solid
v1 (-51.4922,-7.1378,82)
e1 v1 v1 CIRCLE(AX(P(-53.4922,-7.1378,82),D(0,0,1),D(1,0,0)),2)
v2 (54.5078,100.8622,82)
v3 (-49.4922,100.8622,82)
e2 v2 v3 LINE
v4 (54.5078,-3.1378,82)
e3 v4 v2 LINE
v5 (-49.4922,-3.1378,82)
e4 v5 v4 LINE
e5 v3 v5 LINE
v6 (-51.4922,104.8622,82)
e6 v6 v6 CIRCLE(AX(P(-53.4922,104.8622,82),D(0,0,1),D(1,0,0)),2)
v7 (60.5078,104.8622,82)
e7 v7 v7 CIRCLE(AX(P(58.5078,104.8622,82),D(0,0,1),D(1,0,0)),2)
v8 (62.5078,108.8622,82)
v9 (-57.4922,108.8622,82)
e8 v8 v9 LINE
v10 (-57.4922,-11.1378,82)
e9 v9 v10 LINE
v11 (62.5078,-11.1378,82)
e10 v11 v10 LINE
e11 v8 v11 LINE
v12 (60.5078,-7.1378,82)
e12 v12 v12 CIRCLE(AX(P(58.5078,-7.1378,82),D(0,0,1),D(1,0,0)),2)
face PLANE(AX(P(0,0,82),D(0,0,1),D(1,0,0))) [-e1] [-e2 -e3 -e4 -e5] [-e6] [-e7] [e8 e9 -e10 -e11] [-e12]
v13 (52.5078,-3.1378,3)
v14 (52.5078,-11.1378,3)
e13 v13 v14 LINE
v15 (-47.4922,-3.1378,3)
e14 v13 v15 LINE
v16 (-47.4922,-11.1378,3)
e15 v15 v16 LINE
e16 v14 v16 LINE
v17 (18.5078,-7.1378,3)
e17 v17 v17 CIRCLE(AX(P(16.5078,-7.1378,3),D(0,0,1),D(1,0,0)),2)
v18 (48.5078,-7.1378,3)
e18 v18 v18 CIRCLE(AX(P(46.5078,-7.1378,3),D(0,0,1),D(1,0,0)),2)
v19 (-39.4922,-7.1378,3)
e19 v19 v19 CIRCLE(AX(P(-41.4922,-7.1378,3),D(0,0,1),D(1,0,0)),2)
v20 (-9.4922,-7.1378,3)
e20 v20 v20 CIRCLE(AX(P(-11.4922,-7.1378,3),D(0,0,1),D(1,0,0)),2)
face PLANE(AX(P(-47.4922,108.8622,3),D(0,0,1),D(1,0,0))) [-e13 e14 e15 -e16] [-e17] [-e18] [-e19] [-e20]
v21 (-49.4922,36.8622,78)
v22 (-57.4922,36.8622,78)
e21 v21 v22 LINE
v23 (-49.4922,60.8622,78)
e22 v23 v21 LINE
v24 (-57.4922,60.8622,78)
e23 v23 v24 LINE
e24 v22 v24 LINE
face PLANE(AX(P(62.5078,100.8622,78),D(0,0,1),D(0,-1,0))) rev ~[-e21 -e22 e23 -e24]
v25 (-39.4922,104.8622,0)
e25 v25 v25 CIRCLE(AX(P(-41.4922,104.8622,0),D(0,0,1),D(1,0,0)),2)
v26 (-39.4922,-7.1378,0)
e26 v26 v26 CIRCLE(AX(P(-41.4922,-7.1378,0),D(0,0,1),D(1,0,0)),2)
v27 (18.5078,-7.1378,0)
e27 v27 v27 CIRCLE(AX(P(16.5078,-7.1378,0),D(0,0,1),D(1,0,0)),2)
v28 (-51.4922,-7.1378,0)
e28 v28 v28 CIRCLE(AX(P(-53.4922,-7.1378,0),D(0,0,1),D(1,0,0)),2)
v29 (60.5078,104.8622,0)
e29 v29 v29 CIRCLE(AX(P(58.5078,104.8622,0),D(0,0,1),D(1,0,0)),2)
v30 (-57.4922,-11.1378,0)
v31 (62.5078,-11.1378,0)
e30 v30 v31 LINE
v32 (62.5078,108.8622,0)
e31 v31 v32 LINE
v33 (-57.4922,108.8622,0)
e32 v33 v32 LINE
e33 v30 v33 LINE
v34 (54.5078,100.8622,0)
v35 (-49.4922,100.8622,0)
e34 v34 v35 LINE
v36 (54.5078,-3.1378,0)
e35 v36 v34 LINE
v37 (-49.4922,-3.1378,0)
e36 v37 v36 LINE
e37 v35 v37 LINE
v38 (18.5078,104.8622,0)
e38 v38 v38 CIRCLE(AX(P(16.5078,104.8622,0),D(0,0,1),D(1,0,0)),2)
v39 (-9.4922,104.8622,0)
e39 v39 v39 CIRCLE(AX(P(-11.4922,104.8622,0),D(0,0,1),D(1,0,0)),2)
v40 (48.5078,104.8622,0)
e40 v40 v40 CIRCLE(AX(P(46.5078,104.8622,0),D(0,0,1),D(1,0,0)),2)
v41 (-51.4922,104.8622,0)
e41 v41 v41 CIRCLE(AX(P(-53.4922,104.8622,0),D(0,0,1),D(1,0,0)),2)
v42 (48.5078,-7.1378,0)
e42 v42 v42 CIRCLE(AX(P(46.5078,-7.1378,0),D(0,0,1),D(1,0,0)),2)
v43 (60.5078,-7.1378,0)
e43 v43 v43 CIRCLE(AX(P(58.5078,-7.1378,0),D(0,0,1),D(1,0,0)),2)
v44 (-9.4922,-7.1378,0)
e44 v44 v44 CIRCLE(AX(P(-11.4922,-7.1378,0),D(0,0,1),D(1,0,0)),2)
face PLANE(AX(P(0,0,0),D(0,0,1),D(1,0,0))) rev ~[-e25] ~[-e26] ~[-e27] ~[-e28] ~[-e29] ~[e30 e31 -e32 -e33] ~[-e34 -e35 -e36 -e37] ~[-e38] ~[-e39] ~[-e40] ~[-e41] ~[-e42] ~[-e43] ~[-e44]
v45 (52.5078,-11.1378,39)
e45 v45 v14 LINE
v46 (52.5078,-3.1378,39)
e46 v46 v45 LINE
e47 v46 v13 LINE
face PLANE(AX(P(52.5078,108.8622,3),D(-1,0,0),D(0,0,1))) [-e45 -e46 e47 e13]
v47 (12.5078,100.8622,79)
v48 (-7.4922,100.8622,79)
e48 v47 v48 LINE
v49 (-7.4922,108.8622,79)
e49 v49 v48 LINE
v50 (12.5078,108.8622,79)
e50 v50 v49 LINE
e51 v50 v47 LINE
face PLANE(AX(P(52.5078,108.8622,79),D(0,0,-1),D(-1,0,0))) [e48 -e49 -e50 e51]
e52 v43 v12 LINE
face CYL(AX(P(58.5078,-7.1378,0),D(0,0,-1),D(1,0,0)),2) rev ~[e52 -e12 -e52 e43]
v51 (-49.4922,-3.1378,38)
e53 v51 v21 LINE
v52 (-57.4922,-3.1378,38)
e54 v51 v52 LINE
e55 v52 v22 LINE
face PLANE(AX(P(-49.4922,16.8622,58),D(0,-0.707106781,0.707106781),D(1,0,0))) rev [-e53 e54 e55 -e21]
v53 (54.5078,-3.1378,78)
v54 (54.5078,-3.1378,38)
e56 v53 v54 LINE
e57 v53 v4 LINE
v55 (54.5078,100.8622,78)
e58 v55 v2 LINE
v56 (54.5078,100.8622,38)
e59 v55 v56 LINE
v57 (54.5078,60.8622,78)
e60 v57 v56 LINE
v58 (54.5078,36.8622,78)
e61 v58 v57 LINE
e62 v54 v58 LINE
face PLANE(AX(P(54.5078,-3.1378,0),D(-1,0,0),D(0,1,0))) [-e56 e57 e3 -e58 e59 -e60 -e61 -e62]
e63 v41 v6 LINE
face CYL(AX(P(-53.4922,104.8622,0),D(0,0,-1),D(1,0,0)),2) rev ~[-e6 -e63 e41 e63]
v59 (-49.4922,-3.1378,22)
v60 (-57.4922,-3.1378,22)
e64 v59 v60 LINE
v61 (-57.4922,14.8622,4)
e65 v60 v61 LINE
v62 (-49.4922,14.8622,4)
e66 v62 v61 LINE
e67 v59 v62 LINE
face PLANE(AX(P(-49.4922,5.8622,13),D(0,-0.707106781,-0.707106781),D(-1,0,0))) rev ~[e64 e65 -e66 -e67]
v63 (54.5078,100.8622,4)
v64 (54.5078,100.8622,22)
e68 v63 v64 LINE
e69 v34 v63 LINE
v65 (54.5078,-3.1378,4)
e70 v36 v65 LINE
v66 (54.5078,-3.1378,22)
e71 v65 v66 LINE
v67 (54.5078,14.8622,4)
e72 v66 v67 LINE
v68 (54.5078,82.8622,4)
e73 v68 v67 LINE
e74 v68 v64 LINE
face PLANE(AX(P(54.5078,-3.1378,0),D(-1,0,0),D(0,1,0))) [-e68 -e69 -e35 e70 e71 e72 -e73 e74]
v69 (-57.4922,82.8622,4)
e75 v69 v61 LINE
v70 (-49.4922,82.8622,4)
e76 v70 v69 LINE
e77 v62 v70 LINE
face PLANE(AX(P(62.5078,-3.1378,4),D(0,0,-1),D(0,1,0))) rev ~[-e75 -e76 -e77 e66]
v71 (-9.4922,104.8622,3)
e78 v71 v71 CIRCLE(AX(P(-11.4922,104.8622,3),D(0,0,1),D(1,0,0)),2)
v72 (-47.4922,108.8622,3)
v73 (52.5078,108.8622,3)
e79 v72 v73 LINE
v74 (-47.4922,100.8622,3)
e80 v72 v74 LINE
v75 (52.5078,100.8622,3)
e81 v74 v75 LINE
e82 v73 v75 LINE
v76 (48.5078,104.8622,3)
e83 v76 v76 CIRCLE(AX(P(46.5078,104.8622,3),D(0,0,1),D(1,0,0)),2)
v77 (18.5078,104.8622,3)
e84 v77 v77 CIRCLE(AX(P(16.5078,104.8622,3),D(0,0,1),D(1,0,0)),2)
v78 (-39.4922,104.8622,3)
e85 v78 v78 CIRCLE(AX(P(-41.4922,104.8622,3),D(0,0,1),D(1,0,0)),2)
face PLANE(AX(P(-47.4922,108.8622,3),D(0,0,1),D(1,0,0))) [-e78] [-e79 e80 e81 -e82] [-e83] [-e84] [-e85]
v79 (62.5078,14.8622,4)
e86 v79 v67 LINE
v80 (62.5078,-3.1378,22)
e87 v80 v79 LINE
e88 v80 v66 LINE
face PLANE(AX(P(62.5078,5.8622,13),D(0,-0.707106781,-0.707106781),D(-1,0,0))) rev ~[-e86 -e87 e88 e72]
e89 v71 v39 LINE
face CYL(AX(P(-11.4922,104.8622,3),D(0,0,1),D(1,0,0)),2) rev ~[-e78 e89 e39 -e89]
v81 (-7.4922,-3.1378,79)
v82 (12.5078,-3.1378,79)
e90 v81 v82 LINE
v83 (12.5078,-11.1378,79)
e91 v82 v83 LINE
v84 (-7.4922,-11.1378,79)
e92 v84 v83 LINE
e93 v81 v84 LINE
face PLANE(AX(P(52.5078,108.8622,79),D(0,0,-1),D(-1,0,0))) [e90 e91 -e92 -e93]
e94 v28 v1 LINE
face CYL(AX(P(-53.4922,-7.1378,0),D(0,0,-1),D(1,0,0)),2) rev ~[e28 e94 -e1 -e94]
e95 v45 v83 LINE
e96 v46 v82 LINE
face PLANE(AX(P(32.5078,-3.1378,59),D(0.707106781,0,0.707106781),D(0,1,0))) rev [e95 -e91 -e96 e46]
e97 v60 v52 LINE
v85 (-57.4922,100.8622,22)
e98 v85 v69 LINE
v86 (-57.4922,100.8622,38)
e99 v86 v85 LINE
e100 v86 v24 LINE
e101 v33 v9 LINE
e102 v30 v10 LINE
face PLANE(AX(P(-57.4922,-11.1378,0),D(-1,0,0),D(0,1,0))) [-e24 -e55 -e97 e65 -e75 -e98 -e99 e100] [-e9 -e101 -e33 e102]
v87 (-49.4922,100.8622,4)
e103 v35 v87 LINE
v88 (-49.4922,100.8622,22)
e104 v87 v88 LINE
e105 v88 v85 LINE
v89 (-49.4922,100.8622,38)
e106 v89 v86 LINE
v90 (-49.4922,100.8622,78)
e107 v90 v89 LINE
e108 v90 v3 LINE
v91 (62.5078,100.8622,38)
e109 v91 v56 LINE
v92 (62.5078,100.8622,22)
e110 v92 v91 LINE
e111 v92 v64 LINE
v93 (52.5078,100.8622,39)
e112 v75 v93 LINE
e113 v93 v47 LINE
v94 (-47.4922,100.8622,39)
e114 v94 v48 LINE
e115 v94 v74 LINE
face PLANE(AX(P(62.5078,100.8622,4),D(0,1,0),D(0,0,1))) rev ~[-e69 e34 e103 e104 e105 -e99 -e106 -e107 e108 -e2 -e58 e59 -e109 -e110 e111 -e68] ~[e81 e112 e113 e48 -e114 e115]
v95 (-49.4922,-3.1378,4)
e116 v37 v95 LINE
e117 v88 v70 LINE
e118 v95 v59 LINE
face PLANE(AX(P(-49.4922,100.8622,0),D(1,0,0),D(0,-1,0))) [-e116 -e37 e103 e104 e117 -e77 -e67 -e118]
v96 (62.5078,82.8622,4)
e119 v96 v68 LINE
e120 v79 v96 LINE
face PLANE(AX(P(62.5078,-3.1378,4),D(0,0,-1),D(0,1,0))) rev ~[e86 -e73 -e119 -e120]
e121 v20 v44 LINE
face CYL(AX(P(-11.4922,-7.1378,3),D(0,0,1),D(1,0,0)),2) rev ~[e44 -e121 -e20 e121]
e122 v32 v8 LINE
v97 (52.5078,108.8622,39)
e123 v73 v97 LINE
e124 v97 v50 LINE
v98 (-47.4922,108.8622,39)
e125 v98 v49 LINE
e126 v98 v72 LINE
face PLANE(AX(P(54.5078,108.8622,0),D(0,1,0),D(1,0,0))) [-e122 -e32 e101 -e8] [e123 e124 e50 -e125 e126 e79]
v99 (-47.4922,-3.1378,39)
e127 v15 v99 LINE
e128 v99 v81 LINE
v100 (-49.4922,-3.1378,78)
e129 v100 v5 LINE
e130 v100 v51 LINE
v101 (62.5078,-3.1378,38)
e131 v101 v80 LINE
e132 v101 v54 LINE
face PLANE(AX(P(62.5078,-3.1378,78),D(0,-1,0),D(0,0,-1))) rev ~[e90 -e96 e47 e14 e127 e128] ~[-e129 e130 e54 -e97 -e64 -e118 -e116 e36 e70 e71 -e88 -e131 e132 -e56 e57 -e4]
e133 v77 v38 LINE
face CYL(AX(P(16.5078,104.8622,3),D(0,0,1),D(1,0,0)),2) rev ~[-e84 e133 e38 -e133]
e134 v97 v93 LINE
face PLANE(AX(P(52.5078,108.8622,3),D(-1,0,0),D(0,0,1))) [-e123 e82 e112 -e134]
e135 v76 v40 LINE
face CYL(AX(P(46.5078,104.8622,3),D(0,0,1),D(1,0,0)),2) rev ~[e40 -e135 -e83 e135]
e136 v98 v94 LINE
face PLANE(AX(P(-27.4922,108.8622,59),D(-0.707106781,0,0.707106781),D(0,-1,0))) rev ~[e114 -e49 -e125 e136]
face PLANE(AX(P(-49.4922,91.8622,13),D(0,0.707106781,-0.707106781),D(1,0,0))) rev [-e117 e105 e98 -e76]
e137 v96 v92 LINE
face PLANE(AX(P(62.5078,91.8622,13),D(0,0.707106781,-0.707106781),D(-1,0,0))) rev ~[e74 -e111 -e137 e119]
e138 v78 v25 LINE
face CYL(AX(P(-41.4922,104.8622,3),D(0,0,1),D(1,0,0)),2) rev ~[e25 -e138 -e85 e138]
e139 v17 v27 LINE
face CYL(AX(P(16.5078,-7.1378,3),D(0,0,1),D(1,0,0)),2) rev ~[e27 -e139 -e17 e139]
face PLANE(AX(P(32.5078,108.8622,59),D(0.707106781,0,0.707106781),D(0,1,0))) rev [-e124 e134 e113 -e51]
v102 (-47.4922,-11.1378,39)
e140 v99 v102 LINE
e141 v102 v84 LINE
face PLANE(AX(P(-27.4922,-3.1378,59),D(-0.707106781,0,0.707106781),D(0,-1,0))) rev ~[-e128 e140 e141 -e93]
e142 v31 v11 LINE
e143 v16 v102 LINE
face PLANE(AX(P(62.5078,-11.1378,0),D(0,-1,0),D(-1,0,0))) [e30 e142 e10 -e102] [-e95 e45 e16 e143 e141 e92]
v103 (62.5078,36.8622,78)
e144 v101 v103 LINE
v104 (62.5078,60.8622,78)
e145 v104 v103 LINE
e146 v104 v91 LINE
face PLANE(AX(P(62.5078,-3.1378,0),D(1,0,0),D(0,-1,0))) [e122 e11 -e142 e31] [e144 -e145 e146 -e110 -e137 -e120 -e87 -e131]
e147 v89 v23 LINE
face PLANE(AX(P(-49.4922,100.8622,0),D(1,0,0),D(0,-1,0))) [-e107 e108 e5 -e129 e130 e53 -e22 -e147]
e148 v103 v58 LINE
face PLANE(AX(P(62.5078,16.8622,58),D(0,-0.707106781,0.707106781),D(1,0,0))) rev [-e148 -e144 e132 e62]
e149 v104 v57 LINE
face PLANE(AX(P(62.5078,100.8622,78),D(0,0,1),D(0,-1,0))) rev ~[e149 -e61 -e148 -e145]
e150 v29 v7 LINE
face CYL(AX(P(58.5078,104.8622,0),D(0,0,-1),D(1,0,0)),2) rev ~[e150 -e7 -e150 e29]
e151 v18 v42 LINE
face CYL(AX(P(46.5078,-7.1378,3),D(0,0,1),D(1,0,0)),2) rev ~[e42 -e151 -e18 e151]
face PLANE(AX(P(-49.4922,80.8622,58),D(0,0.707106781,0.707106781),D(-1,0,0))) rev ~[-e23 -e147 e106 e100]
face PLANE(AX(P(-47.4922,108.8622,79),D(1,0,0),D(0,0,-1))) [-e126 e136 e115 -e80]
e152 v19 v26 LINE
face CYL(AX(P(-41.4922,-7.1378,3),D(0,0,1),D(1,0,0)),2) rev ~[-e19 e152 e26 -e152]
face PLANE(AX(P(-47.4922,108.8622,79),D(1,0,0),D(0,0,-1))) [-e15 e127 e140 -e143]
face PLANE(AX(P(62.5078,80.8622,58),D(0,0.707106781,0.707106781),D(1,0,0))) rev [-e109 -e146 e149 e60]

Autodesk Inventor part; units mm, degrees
ref_plane "YZ Plane" through (0, 0, 0) normal (1, 0, 0) x (0, 1, 0)
ref_plane "XZ Plane" through (0, 0, 0) normal (0, 1, 0) x (-1, 0, 0)
ref_plane "XY Plane" through (0, 0, 0) normal (0, 0, 1) x (1, 0, 0)
ref_plane "Work Plane1" through (0, 0, 0) normal (0, 0, 1) x (1, 0, 0)
sketch "Sketch1" plane through (0, 0, 0) normal (0, 0, 1) x (1, 0, 0)
  line L0 (62.5078, -11.1378) -> (-57.4922, -11.1378)
  line L1 (-57.4922, -11.1378) -> (-57.4922, 108.8622)
  line L2 (-57.4922, 108.8622) -> (62.5078, 108.8622)
  line L3 (62.5078, 108.8622) -> (62.5078, -11.1378)
  line L4 (-57.4922, -11.1378) -> (-49.4922, -11.1378)
  line L5 (-49.4922, -11.1378) -> (-49.4922, -3.1378)
  line L6 (-49.4922, -3.1378) -> (-57.4922, -3.1378)
  line L7 (-57.4922, -3.1378) -> (-57.4922, -11.1378)
  line L8 (-57.4922, 108.8622) -> (-49.4922, 108.8622)
  line L9 (-49.4922, 108.8622) -> (-49.4922, 100.8622)
  line L10 (-49.4922, 100.8622) -> (-57.4922, 100.8622)
  line L11 (-57.4922, 100.8622) -> (-57.4922, 108.8622)
  line L12 (62.5078, -11.1378) -> (54.5078, -11.1378)
  line L13 (54.5078, -11.1378) -> (54.5078, -3.1378)
  line L14 (54.5078, -3.1378) -> (62.5078, -3.1378)
  line L15 (62.5078, -3.1378) -> (62.5078, -11.1378)
  line L16 (62.5078, 108.8622) -> (54.5078, 108.8622)
  line L17 (54.5078, 108.8622) -> (54.5078, 100.8622)
  line L18 (54.5078, 100.8622) -> (62.5078, 100.8622)
  line L19 (62.5078, 100.8622) -> (62.5078, 108.8622)
  circle A0 centre (-53.4922, -7.1378) radius 2
  circle A1 centre (-53.4922, 104.8622) radius 2
  circle A2 centre (58.5078, -7.1378) radius 2
  circle A3 centre (58.5078, 104.8622) radius 2
  line L20 (-49.4922, -3.1378) -> (54.5078, -3.1378)
  line L21 (54.5078, -3.1378) -> (54.5078, 100.8622)
  line L22 (54.5078, 100.8622) -> (-49.4922, 100.8622)
  line L23 (-49.4922, 100.8622) -> (-49.4922, -3.1378)
  point P0 (0, 0)
  point P1 (54.5078, -3.1378)
  point P2 (-49.4922, -3.1378)
  point P3 (-49.4922, -3.1378)
  point P4 (54.5078, 100.8622)
  point P5 (54.5078, 100.8622)
  point P6 (54.5078, -3.1378)
  dimension "d0" = 120
  dimension "d1" = 120
  dimension "d2" = 8
  dimension "d3" = 8
  dimension "d4" = 8
  dimension "d5" = 8
  dimension "d6" = 8
  dimension "d7" = 8
  dimension "d8" = 8
  dimension "d9" = 8
  dimension "d10" = 4
  dimension "d11" = 4
  dimension "d12" = 4
  dimension "d13" = 4
  dimension "d14" = 4
  dimension "d15" = 4
  dimension "d16" = 4
  dimension "d17" = 4
  dimension "d18" = 4
  dimension "d19" = 4
  dimension "d20" = 4
  dimension "d21" = 4
  dimension "d22" = 8
  dimension "d23" = 8
  dimension "d24" = 8
  dimension "d25" = 8
extrude "Extrusion1" add sketch "Sketch1" along normal blind 82 contours L0 L13 L14 L3 | L0 L5 L20 L13 | L14 L21 L18 L3 | L0 L1 L6 L5 | L18 L17 L2 L3 | L6 L1 L10 L23 | L22 L9 L2 L17 | L10 L1 L2 L9
sketch "Sketch2" plane through (62.5078, -11.1378, 0) normal (1, 0, 0) x (0, 0, -1)
  line L0 (-78, 8) -> (-4, 8)
  line L1 (-4, 8) -> (-4, 112)
  line L2 (-4, 112) -> (-78, 112)
  line L3 (-78, 112) -> (-78, 8)
  line L4 (0, 120) -> (-82, 120) projected
  line L5 (-82, 0) -> (-82, 120) projected
  line L6 (0, 0) -> (0, 120) projected
  line L7 (0, 0) -> (-82, 0) projected
  point P0 (0, 11.1378)
  dimension "d30" = 8
  dimension "d31" = 4
  dimension "d67" = 8
  dimension "d68" = 4
extrude "Extrusion2" cut sketch "Sketch2" against normal blind 160 contours L3 L2 L1 L0
sketch "Sketch3" plane through (-57.4922, 108.8622, 0) normal (0, 1, 0) x (1, 0, 0)
  line L0 (110, -79) -> (10, -79)
  line L1 (10, -79) -> (10, -3)
  line L2 (10, -3) -> (110, -3)
  line L3 (110, -3) -> (110, -79)
  line L4 (0, 0) -> (0, -82) projected
  line L5 (120, 0) -> (120, -82) projected
  line L6 (120, -82) -> (0, -82) projected
  line L7 (120, 0) -> (0, 0) projected
  point P0 (57.4922, 0)
  dimension "d38" = 10
  dimension "d39" = 10
  dimension "d40" = 3
  dimension "d41" = 3
extrude "Extrusion3" cut sketch "Sketch3" against normal blind 160 contours L0 L1 L2 L3
sketch "Sketch4" plane through (-47.4922, -3.1378, 3) normal (0, 0, 1) x (1, 0, 0)
  circle A0 centre (94, 108) radius 2
  circle A1 centre (6, 108) radius 2
  circle A2 centre (6, -4) radius 2
  circle A3 centre (94, -4) radius 2
  line L0 (100, -8) -> (0, -8) projected
  line L1 (110, -8) -> (110, 112) projected
  line L2 (-10, 112) -> (-10, -8) projected
  line L3 (110, 112) -> (-10, 112) projected
  circle A4 centre (64, 108) radius 2
  circle A5 centre (64, -4) radius 2
  line L4 (100, 0) -> (100, -8) projected
  circle A6 centre (36, -4) radius 2
  circle A7 centre (36, 108) radius 2
  line L5 (100, 112) -> (100, 104) projected
  line L6 (0, 112) -> (0, 104) projected
  line L7 (0, 0) -> (0, -8) projected
  point P0 (47.4922, 3.1378)
  dimension "d47" = 4
  dimension "d48" = 4
  dimension "d49" = 4
  dimension "d50" = 4
  dimension "d51" = 4
  dimension "d52" = 16
  dimension "d53" = 4
  dimension "d54" = 16
  dimension "d55" = 16
  dimension "d56" = 16
  dimension "d57" = 4
  dimension "d58" = 4
  dimension "d159" = 4
  dimension "d161" = 4
  dimension "d162" = 4
  dimension "d163" = 4
  dimension "d165" = 4
  dimension "d166" = 4
  dimension "d169" = 4
  dimension "d170" = 4
  dimension "d171" = 46
  dimension "d172" = 46
  dimension "d173" = 46
  dimension "d174" = 46
extrude "Extrusion4" cut sketch "Sketch4" against normal through all
chamfer "Chamfer3" distance 40 angle 45 4 edges at (-47.4922, 104.8622, 79) (-47.4922, -7.1378, 79) (52.5078, 104.8622, 79) (52.5078, -7.1378, 79)
chamfer "Chamfer17" distance 18 angle 45 4 edges at (-53.4922, -3.1378, 4) (58.5078, -3.1378, 4) (-53.4922, 100.8622, 4) (58.5078, 100.8622, 4)
chamfer "Chamfer18" distance 40 angle 45 4 edges at (58.5078, -3.1378, 78) (58.5078, 100.8622, 78) (-53.4922, 100.8622, 78) (-53.4922, -3.1378, 78)
equation "\"d25\" = d9"
equation "\"d54\" = d52"
equation "\"d55\" = d52"
equation "\"d56\" = d52"
properties part number "160mm_shunt_box"
